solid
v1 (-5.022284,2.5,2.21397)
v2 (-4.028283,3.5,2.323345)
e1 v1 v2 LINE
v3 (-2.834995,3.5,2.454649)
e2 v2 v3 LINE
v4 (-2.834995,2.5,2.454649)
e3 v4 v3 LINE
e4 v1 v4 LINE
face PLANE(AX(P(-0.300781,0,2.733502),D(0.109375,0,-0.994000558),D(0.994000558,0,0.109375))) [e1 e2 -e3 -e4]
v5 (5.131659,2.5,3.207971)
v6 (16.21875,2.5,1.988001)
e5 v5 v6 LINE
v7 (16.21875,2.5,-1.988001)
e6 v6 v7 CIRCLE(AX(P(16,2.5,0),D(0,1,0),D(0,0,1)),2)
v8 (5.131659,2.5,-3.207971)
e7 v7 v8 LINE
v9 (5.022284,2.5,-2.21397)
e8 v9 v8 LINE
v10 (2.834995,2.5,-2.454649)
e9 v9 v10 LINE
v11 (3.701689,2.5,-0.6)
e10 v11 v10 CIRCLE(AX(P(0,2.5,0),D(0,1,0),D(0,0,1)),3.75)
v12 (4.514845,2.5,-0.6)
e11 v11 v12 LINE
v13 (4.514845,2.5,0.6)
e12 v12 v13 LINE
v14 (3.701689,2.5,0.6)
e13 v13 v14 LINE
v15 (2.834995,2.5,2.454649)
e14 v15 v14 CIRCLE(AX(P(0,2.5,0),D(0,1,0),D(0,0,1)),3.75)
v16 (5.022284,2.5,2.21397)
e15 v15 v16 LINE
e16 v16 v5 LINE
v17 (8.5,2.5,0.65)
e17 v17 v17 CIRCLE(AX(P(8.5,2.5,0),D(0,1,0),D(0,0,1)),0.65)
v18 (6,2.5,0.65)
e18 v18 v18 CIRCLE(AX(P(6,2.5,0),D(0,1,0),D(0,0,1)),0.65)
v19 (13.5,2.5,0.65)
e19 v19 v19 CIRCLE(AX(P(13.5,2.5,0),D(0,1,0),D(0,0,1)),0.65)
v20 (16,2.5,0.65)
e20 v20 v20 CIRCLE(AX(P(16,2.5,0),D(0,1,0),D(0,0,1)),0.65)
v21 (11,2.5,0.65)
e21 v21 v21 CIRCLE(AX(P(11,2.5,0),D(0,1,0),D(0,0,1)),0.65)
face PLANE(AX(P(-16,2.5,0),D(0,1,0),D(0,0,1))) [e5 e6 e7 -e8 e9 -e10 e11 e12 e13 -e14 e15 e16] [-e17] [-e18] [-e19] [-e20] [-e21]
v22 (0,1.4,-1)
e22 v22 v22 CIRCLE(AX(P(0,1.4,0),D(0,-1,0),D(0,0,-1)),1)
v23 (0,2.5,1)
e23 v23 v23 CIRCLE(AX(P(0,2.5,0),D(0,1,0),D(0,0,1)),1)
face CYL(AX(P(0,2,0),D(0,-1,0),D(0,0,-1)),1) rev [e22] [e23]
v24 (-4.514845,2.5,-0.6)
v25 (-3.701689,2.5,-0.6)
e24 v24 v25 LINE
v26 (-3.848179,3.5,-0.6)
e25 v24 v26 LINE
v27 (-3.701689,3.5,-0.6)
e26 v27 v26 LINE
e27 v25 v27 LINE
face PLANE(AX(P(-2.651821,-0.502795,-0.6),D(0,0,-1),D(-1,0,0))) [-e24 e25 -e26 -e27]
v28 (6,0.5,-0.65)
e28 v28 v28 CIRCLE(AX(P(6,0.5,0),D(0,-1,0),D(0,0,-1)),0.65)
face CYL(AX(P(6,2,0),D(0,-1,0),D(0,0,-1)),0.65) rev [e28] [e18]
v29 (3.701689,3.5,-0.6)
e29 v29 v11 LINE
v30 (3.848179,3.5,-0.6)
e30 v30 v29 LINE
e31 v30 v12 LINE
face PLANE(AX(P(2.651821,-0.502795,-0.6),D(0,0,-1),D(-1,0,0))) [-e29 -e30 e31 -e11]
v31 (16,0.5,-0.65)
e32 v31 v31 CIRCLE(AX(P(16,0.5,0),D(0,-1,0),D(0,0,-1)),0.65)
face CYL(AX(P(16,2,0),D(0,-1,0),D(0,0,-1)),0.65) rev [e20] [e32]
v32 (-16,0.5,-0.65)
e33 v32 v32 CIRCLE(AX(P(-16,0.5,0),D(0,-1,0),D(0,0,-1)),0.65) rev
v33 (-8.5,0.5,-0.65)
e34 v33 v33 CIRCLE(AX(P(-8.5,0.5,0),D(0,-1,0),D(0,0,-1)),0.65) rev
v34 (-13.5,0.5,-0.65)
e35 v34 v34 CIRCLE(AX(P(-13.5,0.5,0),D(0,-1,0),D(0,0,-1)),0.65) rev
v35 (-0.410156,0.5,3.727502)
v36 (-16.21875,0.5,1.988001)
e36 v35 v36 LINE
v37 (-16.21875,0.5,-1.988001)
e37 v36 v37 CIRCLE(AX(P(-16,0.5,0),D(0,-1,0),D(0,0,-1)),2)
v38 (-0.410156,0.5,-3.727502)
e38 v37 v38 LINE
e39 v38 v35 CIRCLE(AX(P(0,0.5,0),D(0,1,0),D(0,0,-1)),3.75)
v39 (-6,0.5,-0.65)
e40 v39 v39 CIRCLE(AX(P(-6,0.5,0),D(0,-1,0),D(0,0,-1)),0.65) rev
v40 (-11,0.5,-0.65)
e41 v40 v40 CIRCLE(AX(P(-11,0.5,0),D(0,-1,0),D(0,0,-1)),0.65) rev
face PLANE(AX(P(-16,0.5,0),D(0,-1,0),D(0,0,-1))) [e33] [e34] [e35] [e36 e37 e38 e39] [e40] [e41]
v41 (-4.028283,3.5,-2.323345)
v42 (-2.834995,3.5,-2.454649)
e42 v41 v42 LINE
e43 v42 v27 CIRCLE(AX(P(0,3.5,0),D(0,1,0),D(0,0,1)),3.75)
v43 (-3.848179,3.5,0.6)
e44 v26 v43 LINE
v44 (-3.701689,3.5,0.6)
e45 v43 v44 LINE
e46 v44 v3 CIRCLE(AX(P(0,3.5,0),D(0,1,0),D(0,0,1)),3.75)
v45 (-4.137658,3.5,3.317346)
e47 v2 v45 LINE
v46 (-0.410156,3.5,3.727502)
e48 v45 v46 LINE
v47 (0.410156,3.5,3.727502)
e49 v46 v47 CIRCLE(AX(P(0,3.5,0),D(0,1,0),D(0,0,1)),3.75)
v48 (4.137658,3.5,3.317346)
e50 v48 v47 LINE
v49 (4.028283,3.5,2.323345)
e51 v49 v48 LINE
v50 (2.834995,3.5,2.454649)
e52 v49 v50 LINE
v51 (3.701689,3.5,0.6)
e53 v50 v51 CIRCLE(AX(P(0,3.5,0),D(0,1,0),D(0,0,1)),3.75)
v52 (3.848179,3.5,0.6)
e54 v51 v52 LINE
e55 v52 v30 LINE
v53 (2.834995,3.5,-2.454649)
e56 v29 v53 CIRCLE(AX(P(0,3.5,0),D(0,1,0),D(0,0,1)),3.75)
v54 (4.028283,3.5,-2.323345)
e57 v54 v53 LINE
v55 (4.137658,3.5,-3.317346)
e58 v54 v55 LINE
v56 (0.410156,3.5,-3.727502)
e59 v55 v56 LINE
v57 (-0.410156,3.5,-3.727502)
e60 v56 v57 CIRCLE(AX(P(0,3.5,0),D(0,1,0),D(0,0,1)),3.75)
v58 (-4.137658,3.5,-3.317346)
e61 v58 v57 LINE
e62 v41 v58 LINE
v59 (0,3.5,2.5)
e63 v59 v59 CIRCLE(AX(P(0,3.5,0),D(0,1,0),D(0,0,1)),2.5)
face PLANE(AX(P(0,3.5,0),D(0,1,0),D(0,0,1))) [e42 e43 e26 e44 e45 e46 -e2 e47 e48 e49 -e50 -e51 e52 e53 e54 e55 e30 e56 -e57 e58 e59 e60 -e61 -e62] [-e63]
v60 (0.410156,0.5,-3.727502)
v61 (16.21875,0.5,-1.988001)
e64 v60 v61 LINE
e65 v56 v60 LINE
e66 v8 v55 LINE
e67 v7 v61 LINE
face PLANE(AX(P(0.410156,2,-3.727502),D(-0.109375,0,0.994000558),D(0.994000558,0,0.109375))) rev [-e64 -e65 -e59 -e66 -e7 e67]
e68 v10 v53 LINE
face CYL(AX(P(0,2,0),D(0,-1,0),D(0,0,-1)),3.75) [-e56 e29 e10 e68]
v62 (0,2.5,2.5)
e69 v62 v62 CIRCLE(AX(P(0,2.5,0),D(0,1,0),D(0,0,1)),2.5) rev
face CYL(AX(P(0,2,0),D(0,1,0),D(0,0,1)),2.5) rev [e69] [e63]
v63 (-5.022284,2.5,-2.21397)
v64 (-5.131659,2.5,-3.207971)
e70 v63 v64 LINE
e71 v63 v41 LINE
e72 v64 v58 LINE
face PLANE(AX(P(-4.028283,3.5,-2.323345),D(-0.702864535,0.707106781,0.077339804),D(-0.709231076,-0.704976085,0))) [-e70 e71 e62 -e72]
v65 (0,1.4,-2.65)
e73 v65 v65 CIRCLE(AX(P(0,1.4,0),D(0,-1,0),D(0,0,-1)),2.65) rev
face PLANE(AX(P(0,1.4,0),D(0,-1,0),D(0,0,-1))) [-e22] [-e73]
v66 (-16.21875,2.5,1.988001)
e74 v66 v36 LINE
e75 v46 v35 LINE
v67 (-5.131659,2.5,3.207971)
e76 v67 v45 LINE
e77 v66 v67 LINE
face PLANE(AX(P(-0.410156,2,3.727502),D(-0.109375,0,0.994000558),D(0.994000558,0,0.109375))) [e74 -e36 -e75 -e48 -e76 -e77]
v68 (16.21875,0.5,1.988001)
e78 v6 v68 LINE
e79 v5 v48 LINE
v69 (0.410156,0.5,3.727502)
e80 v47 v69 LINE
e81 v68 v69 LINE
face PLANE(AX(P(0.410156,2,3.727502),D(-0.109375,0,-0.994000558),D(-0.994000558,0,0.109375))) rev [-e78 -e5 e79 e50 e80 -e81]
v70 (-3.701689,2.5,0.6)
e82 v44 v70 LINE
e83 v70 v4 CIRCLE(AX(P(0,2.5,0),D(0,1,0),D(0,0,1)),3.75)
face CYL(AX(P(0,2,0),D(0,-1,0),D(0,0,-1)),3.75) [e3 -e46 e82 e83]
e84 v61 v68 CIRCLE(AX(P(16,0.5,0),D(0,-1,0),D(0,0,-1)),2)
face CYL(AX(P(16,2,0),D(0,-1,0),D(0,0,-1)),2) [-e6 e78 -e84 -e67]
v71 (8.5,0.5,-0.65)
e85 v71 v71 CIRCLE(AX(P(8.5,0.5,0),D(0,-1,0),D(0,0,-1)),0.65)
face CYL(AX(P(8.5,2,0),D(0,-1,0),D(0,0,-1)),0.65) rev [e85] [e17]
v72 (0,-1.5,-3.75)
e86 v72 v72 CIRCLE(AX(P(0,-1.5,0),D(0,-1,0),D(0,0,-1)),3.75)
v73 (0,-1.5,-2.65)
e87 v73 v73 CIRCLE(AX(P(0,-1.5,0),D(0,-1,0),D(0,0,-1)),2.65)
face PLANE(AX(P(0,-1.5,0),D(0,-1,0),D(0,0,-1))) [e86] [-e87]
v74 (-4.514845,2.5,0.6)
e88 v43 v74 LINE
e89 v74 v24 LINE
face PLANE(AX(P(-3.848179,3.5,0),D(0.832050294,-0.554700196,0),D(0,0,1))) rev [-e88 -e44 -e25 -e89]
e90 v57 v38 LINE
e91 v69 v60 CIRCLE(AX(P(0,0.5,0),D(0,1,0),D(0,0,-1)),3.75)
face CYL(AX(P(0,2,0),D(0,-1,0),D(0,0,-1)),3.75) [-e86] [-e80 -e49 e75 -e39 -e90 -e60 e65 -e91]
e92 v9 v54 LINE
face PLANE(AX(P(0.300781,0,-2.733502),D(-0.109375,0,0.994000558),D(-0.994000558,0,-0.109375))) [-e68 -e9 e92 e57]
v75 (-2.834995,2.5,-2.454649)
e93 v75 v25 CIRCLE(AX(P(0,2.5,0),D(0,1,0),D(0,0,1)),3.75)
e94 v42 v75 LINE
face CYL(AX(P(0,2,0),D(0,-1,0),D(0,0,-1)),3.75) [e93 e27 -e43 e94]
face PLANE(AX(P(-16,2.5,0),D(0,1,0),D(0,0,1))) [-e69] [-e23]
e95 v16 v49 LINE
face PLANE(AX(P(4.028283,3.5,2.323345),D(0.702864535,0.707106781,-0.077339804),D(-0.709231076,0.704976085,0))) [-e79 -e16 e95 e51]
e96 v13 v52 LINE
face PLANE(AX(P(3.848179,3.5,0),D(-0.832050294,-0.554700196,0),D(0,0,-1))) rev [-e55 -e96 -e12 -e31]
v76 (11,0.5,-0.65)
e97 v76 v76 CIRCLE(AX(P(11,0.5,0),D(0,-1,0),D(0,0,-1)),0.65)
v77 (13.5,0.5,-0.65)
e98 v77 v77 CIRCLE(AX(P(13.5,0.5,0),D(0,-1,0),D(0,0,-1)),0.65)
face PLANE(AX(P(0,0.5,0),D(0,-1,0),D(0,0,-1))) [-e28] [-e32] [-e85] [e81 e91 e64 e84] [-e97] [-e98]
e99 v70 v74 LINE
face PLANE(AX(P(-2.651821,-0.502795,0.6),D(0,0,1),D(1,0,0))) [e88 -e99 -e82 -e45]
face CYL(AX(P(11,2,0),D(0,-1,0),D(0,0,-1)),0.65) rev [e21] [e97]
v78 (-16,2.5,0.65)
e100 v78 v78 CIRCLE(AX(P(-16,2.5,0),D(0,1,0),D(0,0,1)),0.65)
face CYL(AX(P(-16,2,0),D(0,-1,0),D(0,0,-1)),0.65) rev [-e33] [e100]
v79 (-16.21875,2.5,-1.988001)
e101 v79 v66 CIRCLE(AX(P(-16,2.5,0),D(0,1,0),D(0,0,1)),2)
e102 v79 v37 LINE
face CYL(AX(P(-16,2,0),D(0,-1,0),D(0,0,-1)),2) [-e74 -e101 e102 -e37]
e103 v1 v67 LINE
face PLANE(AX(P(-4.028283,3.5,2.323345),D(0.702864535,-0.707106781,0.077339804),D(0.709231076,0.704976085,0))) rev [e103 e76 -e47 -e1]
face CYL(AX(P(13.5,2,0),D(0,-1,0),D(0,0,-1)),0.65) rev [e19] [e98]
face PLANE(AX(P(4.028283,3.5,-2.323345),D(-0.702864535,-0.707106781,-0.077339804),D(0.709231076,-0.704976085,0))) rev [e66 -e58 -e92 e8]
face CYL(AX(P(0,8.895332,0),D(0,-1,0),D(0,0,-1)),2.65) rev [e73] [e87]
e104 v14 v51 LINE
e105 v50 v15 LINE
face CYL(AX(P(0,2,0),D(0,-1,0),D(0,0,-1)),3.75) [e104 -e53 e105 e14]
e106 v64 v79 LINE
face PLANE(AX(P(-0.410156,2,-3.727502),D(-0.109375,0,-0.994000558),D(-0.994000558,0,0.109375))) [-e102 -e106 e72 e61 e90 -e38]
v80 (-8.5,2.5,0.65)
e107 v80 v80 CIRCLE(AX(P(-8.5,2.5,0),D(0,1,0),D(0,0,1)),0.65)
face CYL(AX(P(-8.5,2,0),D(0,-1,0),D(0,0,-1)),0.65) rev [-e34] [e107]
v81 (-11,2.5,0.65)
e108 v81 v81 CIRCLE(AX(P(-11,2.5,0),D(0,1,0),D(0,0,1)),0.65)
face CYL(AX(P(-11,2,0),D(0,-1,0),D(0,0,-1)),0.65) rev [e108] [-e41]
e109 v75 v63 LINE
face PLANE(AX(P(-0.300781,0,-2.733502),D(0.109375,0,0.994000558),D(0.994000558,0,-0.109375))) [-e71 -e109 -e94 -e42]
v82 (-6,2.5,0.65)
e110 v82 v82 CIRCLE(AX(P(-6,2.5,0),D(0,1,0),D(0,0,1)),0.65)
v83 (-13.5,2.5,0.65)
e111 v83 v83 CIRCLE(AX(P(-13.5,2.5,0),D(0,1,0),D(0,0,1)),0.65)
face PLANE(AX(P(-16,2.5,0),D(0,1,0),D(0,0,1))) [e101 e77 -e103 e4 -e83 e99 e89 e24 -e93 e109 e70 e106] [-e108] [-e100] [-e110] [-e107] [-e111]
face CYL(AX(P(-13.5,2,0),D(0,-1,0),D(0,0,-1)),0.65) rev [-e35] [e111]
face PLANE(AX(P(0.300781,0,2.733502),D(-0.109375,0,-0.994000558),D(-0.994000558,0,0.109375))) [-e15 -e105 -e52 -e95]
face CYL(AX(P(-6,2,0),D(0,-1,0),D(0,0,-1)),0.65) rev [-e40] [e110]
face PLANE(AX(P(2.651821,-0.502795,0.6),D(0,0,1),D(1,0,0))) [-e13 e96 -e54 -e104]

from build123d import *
from OCP.BRepFilletAPI import BRepFilletAPI_MakeChamfer
from build123d.topology import SkipClean

# Parameters (mm, degrees)
SKETCH_1_R            = 0.65
SKETCH_1_R_2          = 1
EXTRUDE_1_DEPTH       = 2
EXTRUDE_START         = 1.5
SKETCH_2_R            = 3.75
SKETCH_2_R_2          = 1
EXTRUDE_2_DEPTH       = 1.5
SKETCH_3_R            = 3.75
SKETCH_3_R_2          = 1
EXTRUDE_3_DEPTH       = 1.5
EXTRUDE_4_DEPTH       = 1
SKETCH_5_R            = 2.5
CUT_EXTRUDE_1_DEPTH   = 2.5
CUT_EXTRUDE_START     = -1.5
SKETCH_6_R            = 2.5
CUT_EXTRUDE_2_DEPTH   = 1.5
MIRROR_2_COPY_1_DEPTH = 1
SKETCH_7_W            = 2.19635709
SKETCH_7_H            = 1.2
EXTRUDE_5_DEPTH       = 1.5
CHAMFER_1_SIZE        = 1.5
CHAMFER_1_SIZE_2      = 1
SKETCH_8_R            = 1
SKETCH_8_R_2          = 0.65
EXTRUDE_6_DEPTH       = 0.5
CUT_EXTRUDE_3_DEPTH   = 0.5
SKETCH_10_R           = 2.5
CUT_EXTRUDE_4_DEPTH   = 1.4
SKETCH_11_R           = 2.65
CUT_EXTRUDE_5_DEPTH   = 2.9


with BuildPart() as part:
    # 草图1 → 凸台-拉伸1 (new body)
    with BuildSketch(Plane(origin=(0, 0, 0), x_dir=(1, 0, 0), z_dir=(0, 1, 0))):
        with BuildLine():
            Line((0.41015625, 3.727502093), (16.21875, 1.988001116))
            ThreePointArc((16.21875, 1.988001116), (18, 0), (16.21875, -1.988001116))
            Line((16.21875, -1.988001116), (0.41015625, -3.727502093))
            ThreePointArc((0.41015625, -3.727502093), (-3.75, 0), (0.41015625, 3.727502093))
        make_face()
        with Locations(Location((16, 0, 0), (0, 0, 270))):
            Circle(SKETCH_1_R, mode=Mode.SUBTRACT)
        with Locations(Location((6, 0, 0), (0, 0, 270))):
            Circle(SKETCH_1_R, mode=Mode.SUBTRACT)
        with Locations(Location((8.5, 0, 0), (0, 0, 270))):
            Circle(SKETCH_1_R, mode=Mode.SUBTRACT)
        with Locations(Location((11, 0, 0), (0, 0, 270))):
            Circle(SKETCH_1_R, mode=Mode.SUBTRACT)
        with Locations(Location((13.5, 0, 0), (0, 0, 270))):
            Circle(SKETCH_1_R, mode=Mode.SUBTRACT)
        with Locations(Location((0, 0, 0), (0, 0, 270))):
            Circle(SKETCH_1_R_2, mode=Mode.SUBTRACT)
    extrude_1 = extrude(amount=EXTRUDE_1_DEPTH)

    # 草图2 → 凸台-拉伸2 (add)
    with SkipClean():  # the faces are left unmerged after this step: merging them gives an invalid solid
        with BuildSketch(Plane.XZ.offset(EXTRUDE_START)):
            with Locations(Location((0, 0, 0), (0, 0, 270))):
                Circle(SKETCH_2_R)
            with Locations(Location((0, 0, 0), (0, 0, 270))):
                Circle(SKETCH_2_R_2, mode=Mode.SUBTRACT)
        extrude(amount=-EXTRUDE_2_DEPTH)

    # 草图3 → 凸台-拉伸3 (add)
    with SkipClean():  # the faces are left unmerged after this step: merging them gives an invalid solid
        with BuildSketch(Plane(origin=(0, 2, 0), x_dir=(1, 0, 0), z_dir=(0, 1, 0))):
            with Locations(Location((0, 0, 0), (0, 0, 90))):
                Circle(SKETCH_3_R)
            with Locations(Location((0, 0, 0), (0, 0, 90))):
                Circle(SKETCH_3_R_2, mode=Mode.SUBTRACT)
        extrude(amount=EXTRUDE_3_DEPTH)

    # 草图4 → 凸台-拉伸4 (add)
    with SkipClean():  # the faces are left unmerged after this step: merging them gives an invalid solid
        with BuildSketch(Plane(origin=(0.41015625, 0, 3.727502093), x_dir=(0.9940005580355578, 0, -0.10937499999999994), z_dir=(0.10937499999999994, 0, 0.9940005580355578))):
            Polygon((0, 2), (0, 3.5), (3.75, 3.5), (5.25, 2), align=None)
        extrude_4 = extrude(amount=-EXTRUDE_4_DEPTH)

    # 镜向1: 凸台-拉伸4 across plane
    with SkipClean():  # the faces are left unmerged after this step: merging them gives an invalid solid
        add(extrude_4.mirror(Plane.XY))

    # 草图5 → 切除-拉伸1 (cut)
    with SkipClean():  # the faces are left unmerged after this step: merging them gives an invalid solid
        with BuildSketch(Plane.XZ.offset(1.5)):
            with Locations(Location((0, 0, 0), (0, 0, 270))):
                Circle(SKETCH_5_R)
        extrude(amount=-CUT_EXTRUDE_1_DEPTH, mode=Mode.SUBTRACT)

    # 草图6 → 切除-拉伸2 (cut)
    with SkipClean():  # the faces are left unmerged after this step: merging them gives an invalid solid
        with BuildSketch(Plane(origin=(0, 3.5, 0), x_dir=(1, 0, 0), z_dir=(0, 1, 0)).offset(CUT_EXTRUDE_START)):
            with Locations(Location((0, 0, 0), (0, 0, 90))):
                Circle(SKETCH_6_R)
        extrude(amount=CUT_EXTRUDE_2_DEPTH, mode=Mode.SUBTRACT)

    # 镜向2: 凸台-拉伸1, 凸台-拉伸4 across plane
    with SkipClean():  # the faces are left unmerged after this step: merging them gives an invalid solid
        add(extrude_1.mirror(Plane(origin=(0, 0, 0), x_dir=(0, 0, 1), z_dir=(1, 0, 0))))
        add(extrude_4.mirror(Plane(origin=(0, 0, 0), x_dir=(0, 0, 1), z_dir=(1, 0, 0))))

    # 镜向2 copy 1 sketch → 镜向2 copy 1 (add)
    with SkipClean():  # the faces are left unmerged after this step: merging them gives an invalid solid
        with BuildSketch(Plane(origin=(-0.41015625, 0, -3.727502093), x_dir=(-0.9940005580355578, 0, 0.10937499999999994), z_dir=(-0.10937499999999994, 0, -0.9940005580355578))):
            Polygon((0, 2), (0, 3.5), (3.75, 3.5), (5.25, 2), align=None)
        extrude(amount=-MIRROR_2_COPY_1_DEPTH)

    # 草图7 → 凸台-拉伸5 (add)
    with SkipClean():  # the faces are left unmerged after this step: merging them gives an invalid solid
        with BuildSketch(Plane(origin=(0, 3.5, 0), x_dir=(1, 0, 0), z_dir=(0, 1, 0))):
            with Locations((3.75, 0)):
                Rectangle(SKETCH_7_W, SKETCH_7_H)
            with Locations((-3.75, 0)):
                Rectangle(SKETCH_7_W, SKETCH_7_H)
        extrude(amount=-EXTRUDE_5_DEPTH)

    # 倒角1
    chamfer_1_edges_1 = [part.edges().sort_by_distance(p)[0] for p in [
        (4.848178545, 3.5, 0),
    ]]
    chamfer_1_side_1 = [part.faces().sort_by_distance(p)[0] for p in [
        (4.848178545, 3.48, 0),
    ]]
    chamfer_1_edges_2 = [part.edges().sort_by_distance(p)[0] for p in [
        (-4.848178545, 3.5, 0),
    ]]
    chamfer_1_side_2 = [part.faces().sort_by_distance(p)[0] for p in [
        (-4.848178545, 3.48, 0),
    ]]
    chamfer_1 = BRepFilletAPI_MakeChamfer(part.part.solid().wrapped)
    for e in chamfer_1_edges_1:
        chamfer_1.Add(CHAMFER_1_SIZE - 0.0001, CHAMFER_1_SIZE_2 - 0.0001, e.wrapped, chamfer_1_side_1[0].wrapped)
    for e in chamfer_1_edges_2:
        chamfer_1.Add(CHAMFER_1_SIZE - 0.0001, CHAMFER_1_SIZE_2 - 0.0001, e.wrapped, chamfer_1_side_2[0].wrapped)
    add(Compound.cast(chamfer_1.Shape()), mode=Mode.REPLACE)  # a hair under: the kernel refuses the full size

    # 草图8 → 凸台-拉伸6 (add)
    with BuildSketch(Plane(origin=(0, 2, 0), x_dir=(1, 0, 0), z_dir=(0, 1, 0))):
        with BuildLine():
            Line((-5.62865918, -3.153283343), (-16.21875, -1.988001116))
            ThreePointArc((-16.21875, -1.988001116), (-18, 0), (-16.21875, 1.988001116))
            Line((-16.21875, 1.988001116), (-5.62865918, 3.153283343))
            Line((-5.62865918, 3.153283343), (-4.137658343, 3.317345843))
            Line((-4.137658343, 3.317345843), (-0.41015625, 3.727502093))
            ThreePointArc((-0.41015625, 3.727502093), (0, 3.75), (0.41015625, 3.727502093))
            Line((0.41015625, 3.727502093), (4.137658343, 3.317345843))
            Line((4.137658343, 3.317345843), (5.62865918, 3.153283343))
            Line((5.62865918, 3.153283343), (16.21875, 1.988001116))
            ThreePointArc((16.21875, 1.988001116), (18, 0), (16.21875, -1.988001116))
            Line((16.21875, -1.988001116), (5.62865918, -3.153283343))
            Line((5.62865918, -3.153283343), (4.137658343, -3.317345843))
            Line((4.137658343, -3.317345843), (0.41015625, -3.727502093))
            ThreePointArc((0.41015625, -3.727502093), (0, -3.75), (-0.41015625, -3.727502093))
            Line((-0.41015625, -3.727502093), (-4.137658343, -3.317345843))
            Line((-4.137658343, -3.317345843), (-5.62865918, -3.153283343))
        make_face()
        with Locations(Location((0, 0, 0), (0, 0, 270))):
            Circle(SKETCH_8_R, mode=Mode.SUBTRACT)
        with Locations(Location((16, 0, 0), (0, 0, 270))):
            Circle(SKETCH_8_R_2, mode=Mode.SUBTRACT)
        with Locations(Location((13.5, 0, 0), (0, 0, 270))):
            Circle(SKETCH_8_R_2, mode=Mode.SUBTRACT)
        with Locations(Location((11, 0, 0), (0, 0, 270))):
            Circle(SKETCH_8_R_2, mode=Mode.SUBTRACT)
        with Locations(Location((8.5, 0, 0), (0, 0, 270))):
            Circle(SKETCH_8_R_2, mode=Mode.SUBTRACT)
        with Locations(Location((6, 0, 0), (0, 0, 270))):
            Circle(SKETCH_8_R_2, mode=Mode.SUBTRACT)
        with Locations(Location((-6, 0, 0), (0, 0, 270))):
            Circle(SKETCH_8_R_2, mode=Mode.SUBTRACT)
        with Locations(Location((-8.5, 0, 0), (0, 0, 270))):
            Circle(SKETCH_8_R_2, mode=Mode.SUBTRACT)
        with Locations(Location((-11, 0, 0), (0, 0, 270))):
            Circle(SKETCH_8_R_2, mode=Mode.SUBTRACT)
        with Locations(Location((-13.5, 0, 0), (0, 0, 270))):
            Circle(SKETCH_8_R_2, mode=Mode.SUBTRACT)
        with Locations(Location((-16, 0, 0), (0, 0, 270))):
            Circle(SKETCH_8_R_2, mode=Mode.SUBTRACT)
    extrude(amount=EXTRUDE_6_DEPTH)

    # 草图9 → 切除-拉伸3 (cut)
    with BuildSketch(Plane.XZ):
        with BuildLine():
            Line((0.41015625, -3.727502093), (16.21875, -1.988001116))
            ThreePointArc((16.21875, -1.988001116), (18, 0), (16.21875, 1.988001116))
            Line((16.21875, 1.988001116), (0.41015625, 3.727502093))
            ThreePointArc((0.41015625, 3.727502093), (3.75, 0), (0.41015625, -3.727502093))
        make_face()
        with BuildLine():
            Line((-16.21875, -1.988001116), (-0.41015625, -3.727502093))
            ThreePointArc((-0.41015625, -3.727502093), (-3.75, 0), (-0.41015625, 3.727502093))
            Line((-0.41015625, 3.727502093), (-16.21875, 1.988001116))
            ThreePointArc((-16.21875, 1.988001116), (-18, 0), (-16.21875, -1.988001116))
        make_face()
    extrude(amount=-CUT_EXTRUDE_3_DEPTH, mode=Mode.SUBTRACT)

    # 草图10 → 切除-拉伸4 (cut)
    with BuildSketch(Plane.XZ):
        with Locations(Location((0, 0, 0), (0, 0, 270))):
            Circle(SKETCH_10_R)
    extrude(amount=-CUT_EXTRUDE_4_DEPTH, mode=Mode.SUBTRACT)

    # 草图11 → 切除-拉伸5 (cut)
    with BuildSketch(Plane.XZ.offset(1.5)):
        with Locations(Location((0, 0, 0), (0, 0, 270))):
            Circle(SKETCH_11_R)
    extrude(amount=-CUT_EXTRUDE_5_DEPTH, mode=Mode.SUBTRACT)


solid = part.part
